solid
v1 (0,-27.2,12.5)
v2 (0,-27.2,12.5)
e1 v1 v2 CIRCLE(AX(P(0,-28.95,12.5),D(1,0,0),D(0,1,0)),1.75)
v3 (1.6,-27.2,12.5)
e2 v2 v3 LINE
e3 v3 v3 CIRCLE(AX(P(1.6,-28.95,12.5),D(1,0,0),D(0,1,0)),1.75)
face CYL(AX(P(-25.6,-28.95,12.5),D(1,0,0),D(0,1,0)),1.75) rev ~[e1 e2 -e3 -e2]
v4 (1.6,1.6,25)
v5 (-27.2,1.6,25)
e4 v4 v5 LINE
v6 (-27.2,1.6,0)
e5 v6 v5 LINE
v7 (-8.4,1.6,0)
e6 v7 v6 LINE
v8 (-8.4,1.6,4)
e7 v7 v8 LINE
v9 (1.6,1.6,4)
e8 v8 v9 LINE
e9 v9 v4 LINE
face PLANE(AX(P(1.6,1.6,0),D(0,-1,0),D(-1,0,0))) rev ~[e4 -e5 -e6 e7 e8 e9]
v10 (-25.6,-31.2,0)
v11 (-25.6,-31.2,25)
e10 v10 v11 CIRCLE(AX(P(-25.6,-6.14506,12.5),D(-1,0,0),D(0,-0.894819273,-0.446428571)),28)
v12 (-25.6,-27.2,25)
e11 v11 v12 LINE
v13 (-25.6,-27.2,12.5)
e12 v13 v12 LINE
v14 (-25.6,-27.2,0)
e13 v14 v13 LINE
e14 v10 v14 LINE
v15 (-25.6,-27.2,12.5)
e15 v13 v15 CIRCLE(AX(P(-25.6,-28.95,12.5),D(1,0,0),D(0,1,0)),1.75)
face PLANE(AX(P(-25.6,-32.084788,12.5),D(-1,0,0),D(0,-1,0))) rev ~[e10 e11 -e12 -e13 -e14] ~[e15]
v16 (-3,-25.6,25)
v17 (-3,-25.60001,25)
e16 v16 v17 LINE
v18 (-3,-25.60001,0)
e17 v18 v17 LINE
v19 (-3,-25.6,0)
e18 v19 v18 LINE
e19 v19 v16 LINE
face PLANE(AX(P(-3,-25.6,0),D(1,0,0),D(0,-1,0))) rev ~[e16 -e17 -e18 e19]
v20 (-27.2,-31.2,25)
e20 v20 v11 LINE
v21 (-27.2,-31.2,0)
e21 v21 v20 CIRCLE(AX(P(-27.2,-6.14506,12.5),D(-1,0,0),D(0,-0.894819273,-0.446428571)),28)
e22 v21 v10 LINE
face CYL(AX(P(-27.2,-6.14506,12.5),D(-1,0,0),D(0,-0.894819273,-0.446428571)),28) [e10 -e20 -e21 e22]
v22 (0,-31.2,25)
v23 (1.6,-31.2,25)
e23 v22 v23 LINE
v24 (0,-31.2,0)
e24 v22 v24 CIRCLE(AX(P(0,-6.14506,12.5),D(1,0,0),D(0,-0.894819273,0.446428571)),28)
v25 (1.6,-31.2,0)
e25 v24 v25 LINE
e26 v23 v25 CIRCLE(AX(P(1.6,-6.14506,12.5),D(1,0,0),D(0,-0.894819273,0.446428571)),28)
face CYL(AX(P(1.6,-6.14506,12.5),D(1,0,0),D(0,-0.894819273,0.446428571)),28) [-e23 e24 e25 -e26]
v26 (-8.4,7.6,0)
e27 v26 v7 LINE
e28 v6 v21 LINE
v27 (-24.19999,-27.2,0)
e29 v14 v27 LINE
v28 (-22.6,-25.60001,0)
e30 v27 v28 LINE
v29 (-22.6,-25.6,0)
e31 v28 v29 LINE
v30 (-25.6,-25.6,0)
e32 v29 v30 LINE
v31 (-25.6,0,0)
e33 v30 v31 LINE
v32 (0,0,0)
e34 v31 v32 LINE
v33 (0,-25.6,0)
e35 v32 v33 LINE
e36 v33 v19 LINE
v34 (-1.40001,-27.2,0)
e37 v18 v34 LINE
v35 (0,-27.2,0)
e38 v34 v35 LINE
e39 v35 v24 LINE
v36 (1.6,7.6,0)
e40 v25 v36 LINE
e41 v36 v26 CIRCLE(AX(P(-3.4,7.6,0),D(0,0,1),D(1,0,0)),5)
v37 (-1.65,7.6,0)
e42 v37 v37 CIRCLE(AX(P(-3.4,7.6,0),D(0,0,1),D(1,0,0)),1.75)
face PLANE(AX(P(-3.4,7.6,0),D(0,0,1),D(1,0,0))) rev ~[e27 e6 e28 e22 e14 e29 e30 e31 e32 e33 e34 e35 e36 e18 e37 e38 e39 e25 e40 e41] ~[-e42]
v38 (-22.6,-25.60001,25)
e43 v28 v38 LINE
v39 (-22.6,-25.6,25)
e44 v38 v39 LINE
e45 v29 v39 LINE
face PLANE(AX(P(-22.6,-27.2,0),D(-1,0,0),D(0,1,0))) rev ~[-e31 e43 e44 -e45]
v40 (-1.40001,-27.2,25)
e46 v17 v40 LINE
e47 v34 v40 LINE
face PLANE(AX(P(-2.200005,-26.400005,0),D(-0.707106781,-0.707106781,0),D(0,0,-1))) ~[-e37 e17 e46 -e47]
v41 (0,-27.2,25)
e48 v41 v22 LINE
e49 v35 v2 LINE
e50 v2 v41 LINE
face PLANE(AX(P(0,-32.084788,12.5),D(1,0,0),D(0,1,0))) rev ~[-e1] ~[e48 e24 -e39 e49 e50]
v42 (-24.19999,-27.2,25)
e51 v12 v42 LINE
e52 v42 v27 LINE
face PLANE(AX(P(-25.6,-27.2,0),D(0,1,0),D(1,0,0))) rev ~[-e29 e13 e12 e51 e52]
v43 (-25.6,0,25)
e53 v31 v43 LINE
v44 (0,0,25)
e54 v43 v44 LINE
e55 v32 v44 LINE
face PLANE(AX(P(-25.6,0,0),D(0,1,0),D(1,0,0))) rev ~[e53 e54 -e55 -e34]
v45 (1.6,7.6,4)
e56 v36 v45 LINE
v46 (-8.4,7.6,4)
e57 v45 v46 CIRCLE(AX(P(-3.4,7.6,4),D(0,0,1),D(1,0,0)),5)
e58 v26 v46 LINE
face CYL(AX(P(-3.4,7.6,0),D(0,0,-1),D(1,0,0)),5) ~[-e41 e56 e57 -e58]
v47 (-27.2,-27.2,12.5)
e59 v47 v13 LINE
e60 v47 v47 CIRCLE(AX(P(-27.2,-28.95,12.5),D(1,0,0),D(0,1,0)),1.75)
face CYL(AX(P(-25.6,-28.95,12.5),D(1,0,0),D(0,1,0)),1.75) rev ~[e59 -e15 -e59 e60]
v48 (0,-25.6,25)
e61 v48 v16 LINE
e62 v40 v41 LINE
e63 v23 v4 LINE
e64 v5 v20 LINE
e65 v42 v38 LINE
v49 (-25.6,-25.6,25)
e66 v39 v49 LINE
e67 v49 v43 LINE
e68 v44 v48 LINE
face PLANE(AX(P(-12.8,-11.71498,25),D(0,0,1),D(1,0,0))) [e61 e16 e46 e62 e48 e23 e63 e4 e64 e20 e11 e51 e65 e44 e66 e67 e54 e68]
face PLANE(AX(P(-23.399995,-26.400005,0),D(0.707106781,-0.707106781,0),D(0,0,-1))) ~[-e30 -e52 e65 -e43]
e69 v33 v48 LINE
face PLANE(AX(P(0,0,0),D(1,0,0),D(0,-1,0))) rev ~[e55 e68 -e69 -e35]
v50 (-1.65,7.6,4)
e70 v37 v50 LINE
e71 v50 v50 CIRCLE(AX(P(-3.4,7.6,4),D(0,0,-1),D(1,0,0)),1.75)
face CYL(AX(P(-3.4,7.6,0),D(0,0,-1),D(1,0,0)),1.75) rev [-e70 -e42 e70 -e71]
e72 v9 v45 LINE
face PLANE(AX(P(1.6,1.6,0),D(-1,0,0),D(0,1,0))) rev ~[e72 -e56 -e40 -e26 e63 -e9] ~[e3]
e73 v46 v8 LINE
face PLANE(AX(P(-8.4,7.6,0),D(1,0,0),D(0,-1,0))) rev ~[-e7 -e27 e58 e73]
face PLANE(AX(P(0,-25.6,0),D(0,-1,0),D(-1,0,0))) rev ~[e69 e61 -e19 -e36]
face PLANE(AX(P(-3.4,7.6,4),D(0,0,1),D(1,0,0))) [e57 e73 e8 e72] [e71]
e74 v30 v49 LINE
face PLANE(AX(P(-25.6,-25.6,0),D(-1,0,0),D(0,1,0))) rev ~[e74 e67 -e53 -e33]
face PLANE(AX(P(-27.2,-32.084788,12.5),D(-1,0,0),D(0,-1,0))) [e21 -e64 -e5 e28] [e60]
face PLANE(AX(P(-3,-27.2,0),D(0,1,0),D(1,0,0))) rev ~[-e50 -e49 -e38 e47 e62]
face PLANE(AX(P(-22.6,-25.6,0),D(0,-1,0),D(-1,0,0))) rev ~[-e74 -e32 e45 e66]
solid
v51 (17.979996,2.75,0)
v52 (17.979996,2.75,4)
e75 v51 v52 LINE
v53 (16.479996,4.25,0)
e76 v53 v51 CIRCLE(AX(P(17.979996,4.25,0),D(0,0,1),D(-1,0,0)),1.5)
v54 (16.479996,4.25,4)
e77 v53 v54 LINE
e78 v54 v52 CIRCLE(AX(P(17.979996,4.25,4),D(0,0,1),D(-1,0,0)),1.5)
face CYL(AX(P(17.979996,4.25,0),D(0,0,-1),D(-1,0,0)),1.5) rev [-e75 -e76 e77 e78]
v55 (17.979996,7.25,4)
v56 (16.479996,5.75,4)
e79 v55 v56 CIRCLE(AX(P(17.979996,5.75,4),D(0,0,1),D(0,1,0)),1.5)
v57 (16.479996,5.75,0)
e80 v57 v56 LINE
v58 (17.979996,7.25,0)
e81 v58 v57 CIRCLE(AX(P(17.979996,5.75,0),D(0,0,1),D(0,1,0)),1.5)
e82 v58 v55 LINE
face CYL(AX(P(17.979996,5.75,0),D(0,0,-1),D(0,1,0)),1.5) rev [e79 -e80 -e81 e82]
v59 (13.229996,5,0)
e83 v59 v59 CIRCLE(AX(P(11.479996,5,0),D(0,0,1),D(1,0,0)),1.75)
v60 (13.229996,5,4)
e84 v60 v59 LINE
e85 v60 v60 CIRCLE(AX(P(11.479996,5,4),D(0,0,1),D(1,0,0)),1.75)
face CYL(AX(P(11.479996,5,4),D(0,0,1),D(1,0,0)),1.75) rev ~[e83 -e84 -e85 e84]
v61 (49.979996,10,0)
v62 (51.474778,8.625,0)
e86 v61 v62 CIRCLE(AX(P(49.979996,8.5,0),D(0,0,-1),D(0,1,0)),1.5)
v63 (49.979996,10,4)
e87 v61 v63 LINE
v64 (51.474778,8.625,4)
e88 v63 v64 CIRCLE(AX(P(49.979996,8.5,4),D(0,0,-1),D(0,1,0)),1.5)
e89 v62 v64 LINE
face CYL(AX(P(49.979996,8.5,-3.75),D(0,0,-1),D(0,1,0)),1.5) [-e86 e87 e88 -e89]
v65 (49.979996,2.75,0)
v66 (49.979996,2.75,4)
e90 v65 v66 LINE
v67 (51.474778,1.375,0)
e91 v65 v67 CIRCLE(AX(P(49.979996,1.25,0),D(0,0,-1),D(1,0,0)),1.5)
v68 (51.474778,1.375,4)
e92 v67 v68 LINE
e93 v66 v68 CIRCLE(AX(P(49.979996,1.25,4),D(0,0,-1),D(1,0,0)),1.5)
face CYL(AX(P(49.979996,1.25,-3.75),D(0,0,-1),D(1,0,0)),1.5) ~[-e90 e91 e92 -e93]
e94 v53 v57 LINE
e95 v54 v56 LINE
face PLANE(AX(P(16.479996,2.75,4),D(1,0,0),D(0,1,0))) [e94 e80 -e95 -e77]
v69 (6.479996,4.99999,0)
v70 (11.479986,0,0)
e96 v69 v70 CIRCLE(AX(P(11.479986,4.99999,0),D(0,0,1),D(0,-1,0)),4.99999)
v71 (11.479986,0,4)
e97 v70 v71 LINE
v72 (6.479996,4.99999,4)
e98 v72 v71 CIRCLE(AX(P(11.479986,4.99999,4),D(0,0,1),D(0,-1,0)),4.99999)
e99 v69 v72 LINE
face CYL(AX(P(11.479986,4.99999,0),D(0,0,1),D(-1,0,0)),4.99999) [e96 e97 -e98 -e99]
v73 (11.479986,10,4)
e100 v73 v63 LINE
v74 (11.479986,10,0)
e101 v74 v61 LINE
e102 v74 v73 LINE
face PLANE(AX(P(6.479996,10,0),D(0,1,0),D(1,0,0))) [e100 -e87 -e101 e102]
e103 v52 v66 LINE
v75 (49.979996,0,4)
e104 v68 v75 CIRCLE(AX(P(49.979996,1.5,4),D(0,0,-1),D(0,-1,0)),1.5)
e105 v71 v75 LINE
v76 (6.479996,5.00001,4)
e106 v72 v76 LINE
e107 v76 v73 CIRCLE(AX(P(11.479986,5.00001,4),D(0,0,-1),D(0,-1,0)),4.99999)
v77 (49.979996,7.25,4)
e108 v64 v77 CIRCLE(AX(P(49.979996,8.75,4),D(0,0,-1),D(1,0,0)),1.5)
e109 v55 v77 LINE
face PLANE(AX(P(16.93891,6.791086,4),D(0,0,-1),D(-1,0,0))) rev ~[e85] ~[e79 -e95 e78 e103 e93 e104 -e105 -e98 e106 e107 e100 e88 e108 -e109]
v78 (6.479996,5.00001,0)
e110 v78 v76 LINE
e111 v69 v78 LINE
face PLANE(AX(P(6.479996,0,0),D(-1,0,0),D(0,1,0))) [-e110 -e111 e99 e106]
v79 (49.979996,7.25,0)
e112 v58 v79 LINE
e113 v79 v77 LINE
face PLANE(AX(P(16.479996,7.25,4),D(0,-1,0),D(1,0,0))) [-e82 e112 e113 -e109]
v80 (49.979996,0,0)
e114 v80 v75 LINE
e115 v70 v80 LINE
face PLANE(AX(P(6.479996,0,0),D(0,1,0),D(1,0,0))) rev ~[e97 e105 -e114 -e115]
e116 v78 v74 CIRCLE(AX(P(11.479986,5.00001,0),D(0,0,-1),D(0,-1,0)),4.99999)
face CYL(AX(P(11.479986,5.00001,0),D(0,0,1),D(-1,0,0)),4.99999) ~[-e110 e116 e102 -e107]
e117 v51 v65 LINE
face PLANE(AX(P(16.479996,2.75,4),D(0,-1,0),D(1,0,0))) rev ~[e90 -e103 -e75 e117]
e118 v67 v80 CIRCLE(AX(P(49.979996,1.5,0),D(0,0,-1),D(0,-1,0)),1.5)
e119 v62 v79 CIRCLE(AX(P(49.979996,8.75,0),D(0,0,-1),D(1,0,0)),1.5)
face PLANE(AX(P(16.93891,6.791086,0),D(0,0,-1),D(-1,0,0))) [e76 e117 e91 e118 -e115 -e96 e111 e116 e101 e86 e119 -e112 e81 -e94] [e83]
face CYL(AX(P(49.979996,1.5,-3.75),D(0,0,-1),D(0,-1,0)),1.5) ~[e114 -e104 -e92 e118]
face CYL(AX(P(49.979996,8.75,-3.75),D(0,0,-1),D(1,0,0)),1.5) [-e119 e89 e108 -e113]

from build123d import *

# Parameters (mm, degrees)
F1_DEPTH     = 25
F2_SIZE      = 1.59999
F4_DEPTH     = 1.6
F6_DEPTH     = 1.6
F7_R         = 1.75
F8_DEPTH     = 50
F10_DEPTH    = 4
F11_R        = 1.75
F12_DEPTH    = 25.001
F13_W        = 45
F13_H        = 10
F14_DEPTH    = 4
F15_R        = 4.99999
F16_R        = 1.75
F17_DEPTH    = 4.001
F18_W        = 35
F18_H        = 4.5
F19_DEPTH    = 4.001
F20_T1_DEPTH = 4
F20_T3_DEPTH = 11.5


# Not quite as in the source:
# - a fillet or chamfer that OpenCascade refuses, or shapes differently, is made with other operations: its cross-section is extruded or revolved along the edge and cut away or added
# - a fillet or chamfer is up to 0.001 mm smaller than in the source, because OpenCascade refuses the exact size


with BuildPart() as f1:
    # F0 (on Top) → F1 (new body)
    with BuildSketch(Plane.XY):
        Polygon((-25.6, 0), (0, 0), (0, -25.6), (-3, -25.6), (-3, -27.2), (0, -27.2), (0, -31.2), (1.6, -31.2), (1.6, 1.6), (-27.2, 1.6), (-27.2, -31.2), (-25.6, -31.2), (-25.6, -27.2), (-22.6, -27.2), (-22.6, -25.6), (-25.6, -25.6), align=None)
    extrude(amount=F1_DEPTH)

    # F2 (size 1.6 in the source; OpenCascade refuses exactly that, so slightly less here)
    f2_edges = [f1.edges().sort_by_distance(p)[0] for p in [
        (-22.6, -27.2, 12.5),
        (-3, -27.2, 12.5),
    ]]
    chamfer(f2_edges, length=F2_SIZE)

    # F3 (on face) → F4 (join, through all)
    with BuildSketch(Plane(origin=(-27.2, 0, 0), x_dir=(0, -1, 0), z_dir=(-1, 0, 0))):
        with BuildLine():
            Line((31.2, 25), (31.2, 0))
            ThreePointArc((31.2, 0), (34.1450603673, 12.5), (31.2, 25))
        make_face()
    extrude(amount=-F4_DEPTH)

    # F5 (on face) → F6 (join, through all)
    with BuildSketch(Plane.YZ.offset(1.6)):
        with BuildLine():
            Line((-31.2, 0), (-31.2, 25))
            ThreePointArc((-31.2, 25), (-34.1450603673, 12.5), (-31.2, 0))
        make_face()
    extrude(amount=-F6_DEPTH)

    # F7 (on face) → F8 (cut, symmetric)
    with BuildSketch(Plane.YZ.offset(-25.6)):
        with Locations((-28.95, 12.5)):
            Circle(F7_R)
    extrude(amount=F8_DEPTH, both=True, mode=Mode.SUBTRACT)

    # F9 (on Top) → F10 (join)
    with BuildSketch(Plane.XY):
        with BuildLine():
            ThreePointArc((-8.4, 7.6), (-3.4, 2.6), (1.6, 7.6))
            ThreePointArc((1.6, 7.6), (-3.4, 12.6), (-8.4, 7.6))
        make_face()
        with BuildLine():
            Line((1.6, 1.6), (1.6, 7.6))
            ThreePointArc((1.6, 7.6), (-3.4, 2.6), (-8.4, 7.6))
            Line((-8.4, 7.6), (-8.4, 1.6))
            Line((-8.4, 1.6), (1.6, 1.6))
        make_face()
    extrude(amount=F10_DEPTH)

    # F11 (on Top) → F12 (cut, through all)
    with BuildSketch(Plane.XY):
        with Locations((-3.4, 7.6)):
            Circle(F11_R)
    extrude(amount=F12_DEPTH, mode=Mode.SUBTRACT)


with BuildPart() as f14:
    # F13 (on Top) → F14 (new body)
    with BuildSketch(Plane.XY):
        with Locations((28.9799958316, 5)):
            Rectangle(F13_W, F13_H)
    extrude(amount=F14_DEPTH)

    # F15 (radius 5 in the source; OpenCascade refuses exactly that, so slightly less here)
    f15_edges = [f14.edges().sort_by_distance(p)[0] for p in [
        (6.479996, 0, 2),
        (6.479996, 10, 2),
    ]]
    fillet(f15_edges, radius=F15_R)

    # F16 (on face) → F17 (cut, through all)
    with BuildSketch(Plane.XY.offset(4)):
        with Locations((11.4799958316, 5)):
            Circle(F16_R)
    extrude(amount=-F17_DEPTH, mode=Mode.SUBTRACT)

    # F18 (on face) → F19 (cut, through all)
    with BuildSketch(Plane.XY.offset(4)):
        with Locations((33.9799958316, 5)):
            Rectangle(F18_W, F18_H)
    extrude(amount=-F19_DEPTH, mode=Mode.SUBTRACT)

    # F20: fillet of radius 1.5 on 6 edges, made by hand

    # F20_s2 → F20_t1 (join)
    with BuildSketch(Plane.XY):
        with BuildLine():
            ThreePointArc((17.9799958316, 7.25), (16.9193356598, 6.8106601718), (16.4799958316, 5.75))
            Line((16.4799958316, 5.75), (16.4799958316, 7.25))
            Line((16.4799958316, 7.25), (17.9799958316, 7.25))
        make_face()
        with BuildLine():
            ThreePointArc((16.4799958316, 4.25), (16.9193356598, 3.1893398282), (17.9799958316, 2.75))
            Line((17.9799958316, 2.75), (16.4799958316, 2.75))
            Line((16.4799958316, 2.75), (16.4799958316, 4.25))
        make_face()
    extrude(amount=F20_T1_DEPTH)

    # F20_s4 → F20_t3 (cut)
    with BuildSketch(Plane.XY.offset(-3.75)):
        with BuildLine():
            ThreePointArc((51.4799958316, 8.75), (51.0406560034, 7.6893398282), (49.9799958316, 7.25))
            Line((49.9799958316, 7.25), (51.4799958316, 7.25))
            Line((51.4799958316, 7.25), (51.4799958316, 8.75))
        make_face()
        with BuildLine():
            ThreePointArc((49.9799958316, 10), (51.0406560034, 9.5606601718), (51.4799958316, 8.5))
            Line((51.4799958316, 8.5), (51.4799958316, 10))
            Line((51.4799958316, 10), (49.9799958316, 10))
        make_face()
        with BuildLine():
            ThreePointArc((51.4799958316, 1.25), (51.0406560034, 2.3106601718), (49.9799958316, 2.75))
            Line((49.9799958316, 2.75), (51.4799958316, 2.75))
            Line((51.4799958316, 2.75), (51.4799958316, 1.25))
        make_face()
        with BuildLine():
            ThreePointArc((49.9799958316, 0), (51.0406560034, 0.4393398282), (51.4799958316, 1.5))
            Line((51.4799958316, 1.5), (51.4799958316, 0))
            Line((51.4799958316, 0), (49.9799958316, 0))
        make_face()
    extrude(amount=F20_T3_DEPTH, mode=Mode.SUBTRACT)


solid = Compound([f1.part, f14.part])
